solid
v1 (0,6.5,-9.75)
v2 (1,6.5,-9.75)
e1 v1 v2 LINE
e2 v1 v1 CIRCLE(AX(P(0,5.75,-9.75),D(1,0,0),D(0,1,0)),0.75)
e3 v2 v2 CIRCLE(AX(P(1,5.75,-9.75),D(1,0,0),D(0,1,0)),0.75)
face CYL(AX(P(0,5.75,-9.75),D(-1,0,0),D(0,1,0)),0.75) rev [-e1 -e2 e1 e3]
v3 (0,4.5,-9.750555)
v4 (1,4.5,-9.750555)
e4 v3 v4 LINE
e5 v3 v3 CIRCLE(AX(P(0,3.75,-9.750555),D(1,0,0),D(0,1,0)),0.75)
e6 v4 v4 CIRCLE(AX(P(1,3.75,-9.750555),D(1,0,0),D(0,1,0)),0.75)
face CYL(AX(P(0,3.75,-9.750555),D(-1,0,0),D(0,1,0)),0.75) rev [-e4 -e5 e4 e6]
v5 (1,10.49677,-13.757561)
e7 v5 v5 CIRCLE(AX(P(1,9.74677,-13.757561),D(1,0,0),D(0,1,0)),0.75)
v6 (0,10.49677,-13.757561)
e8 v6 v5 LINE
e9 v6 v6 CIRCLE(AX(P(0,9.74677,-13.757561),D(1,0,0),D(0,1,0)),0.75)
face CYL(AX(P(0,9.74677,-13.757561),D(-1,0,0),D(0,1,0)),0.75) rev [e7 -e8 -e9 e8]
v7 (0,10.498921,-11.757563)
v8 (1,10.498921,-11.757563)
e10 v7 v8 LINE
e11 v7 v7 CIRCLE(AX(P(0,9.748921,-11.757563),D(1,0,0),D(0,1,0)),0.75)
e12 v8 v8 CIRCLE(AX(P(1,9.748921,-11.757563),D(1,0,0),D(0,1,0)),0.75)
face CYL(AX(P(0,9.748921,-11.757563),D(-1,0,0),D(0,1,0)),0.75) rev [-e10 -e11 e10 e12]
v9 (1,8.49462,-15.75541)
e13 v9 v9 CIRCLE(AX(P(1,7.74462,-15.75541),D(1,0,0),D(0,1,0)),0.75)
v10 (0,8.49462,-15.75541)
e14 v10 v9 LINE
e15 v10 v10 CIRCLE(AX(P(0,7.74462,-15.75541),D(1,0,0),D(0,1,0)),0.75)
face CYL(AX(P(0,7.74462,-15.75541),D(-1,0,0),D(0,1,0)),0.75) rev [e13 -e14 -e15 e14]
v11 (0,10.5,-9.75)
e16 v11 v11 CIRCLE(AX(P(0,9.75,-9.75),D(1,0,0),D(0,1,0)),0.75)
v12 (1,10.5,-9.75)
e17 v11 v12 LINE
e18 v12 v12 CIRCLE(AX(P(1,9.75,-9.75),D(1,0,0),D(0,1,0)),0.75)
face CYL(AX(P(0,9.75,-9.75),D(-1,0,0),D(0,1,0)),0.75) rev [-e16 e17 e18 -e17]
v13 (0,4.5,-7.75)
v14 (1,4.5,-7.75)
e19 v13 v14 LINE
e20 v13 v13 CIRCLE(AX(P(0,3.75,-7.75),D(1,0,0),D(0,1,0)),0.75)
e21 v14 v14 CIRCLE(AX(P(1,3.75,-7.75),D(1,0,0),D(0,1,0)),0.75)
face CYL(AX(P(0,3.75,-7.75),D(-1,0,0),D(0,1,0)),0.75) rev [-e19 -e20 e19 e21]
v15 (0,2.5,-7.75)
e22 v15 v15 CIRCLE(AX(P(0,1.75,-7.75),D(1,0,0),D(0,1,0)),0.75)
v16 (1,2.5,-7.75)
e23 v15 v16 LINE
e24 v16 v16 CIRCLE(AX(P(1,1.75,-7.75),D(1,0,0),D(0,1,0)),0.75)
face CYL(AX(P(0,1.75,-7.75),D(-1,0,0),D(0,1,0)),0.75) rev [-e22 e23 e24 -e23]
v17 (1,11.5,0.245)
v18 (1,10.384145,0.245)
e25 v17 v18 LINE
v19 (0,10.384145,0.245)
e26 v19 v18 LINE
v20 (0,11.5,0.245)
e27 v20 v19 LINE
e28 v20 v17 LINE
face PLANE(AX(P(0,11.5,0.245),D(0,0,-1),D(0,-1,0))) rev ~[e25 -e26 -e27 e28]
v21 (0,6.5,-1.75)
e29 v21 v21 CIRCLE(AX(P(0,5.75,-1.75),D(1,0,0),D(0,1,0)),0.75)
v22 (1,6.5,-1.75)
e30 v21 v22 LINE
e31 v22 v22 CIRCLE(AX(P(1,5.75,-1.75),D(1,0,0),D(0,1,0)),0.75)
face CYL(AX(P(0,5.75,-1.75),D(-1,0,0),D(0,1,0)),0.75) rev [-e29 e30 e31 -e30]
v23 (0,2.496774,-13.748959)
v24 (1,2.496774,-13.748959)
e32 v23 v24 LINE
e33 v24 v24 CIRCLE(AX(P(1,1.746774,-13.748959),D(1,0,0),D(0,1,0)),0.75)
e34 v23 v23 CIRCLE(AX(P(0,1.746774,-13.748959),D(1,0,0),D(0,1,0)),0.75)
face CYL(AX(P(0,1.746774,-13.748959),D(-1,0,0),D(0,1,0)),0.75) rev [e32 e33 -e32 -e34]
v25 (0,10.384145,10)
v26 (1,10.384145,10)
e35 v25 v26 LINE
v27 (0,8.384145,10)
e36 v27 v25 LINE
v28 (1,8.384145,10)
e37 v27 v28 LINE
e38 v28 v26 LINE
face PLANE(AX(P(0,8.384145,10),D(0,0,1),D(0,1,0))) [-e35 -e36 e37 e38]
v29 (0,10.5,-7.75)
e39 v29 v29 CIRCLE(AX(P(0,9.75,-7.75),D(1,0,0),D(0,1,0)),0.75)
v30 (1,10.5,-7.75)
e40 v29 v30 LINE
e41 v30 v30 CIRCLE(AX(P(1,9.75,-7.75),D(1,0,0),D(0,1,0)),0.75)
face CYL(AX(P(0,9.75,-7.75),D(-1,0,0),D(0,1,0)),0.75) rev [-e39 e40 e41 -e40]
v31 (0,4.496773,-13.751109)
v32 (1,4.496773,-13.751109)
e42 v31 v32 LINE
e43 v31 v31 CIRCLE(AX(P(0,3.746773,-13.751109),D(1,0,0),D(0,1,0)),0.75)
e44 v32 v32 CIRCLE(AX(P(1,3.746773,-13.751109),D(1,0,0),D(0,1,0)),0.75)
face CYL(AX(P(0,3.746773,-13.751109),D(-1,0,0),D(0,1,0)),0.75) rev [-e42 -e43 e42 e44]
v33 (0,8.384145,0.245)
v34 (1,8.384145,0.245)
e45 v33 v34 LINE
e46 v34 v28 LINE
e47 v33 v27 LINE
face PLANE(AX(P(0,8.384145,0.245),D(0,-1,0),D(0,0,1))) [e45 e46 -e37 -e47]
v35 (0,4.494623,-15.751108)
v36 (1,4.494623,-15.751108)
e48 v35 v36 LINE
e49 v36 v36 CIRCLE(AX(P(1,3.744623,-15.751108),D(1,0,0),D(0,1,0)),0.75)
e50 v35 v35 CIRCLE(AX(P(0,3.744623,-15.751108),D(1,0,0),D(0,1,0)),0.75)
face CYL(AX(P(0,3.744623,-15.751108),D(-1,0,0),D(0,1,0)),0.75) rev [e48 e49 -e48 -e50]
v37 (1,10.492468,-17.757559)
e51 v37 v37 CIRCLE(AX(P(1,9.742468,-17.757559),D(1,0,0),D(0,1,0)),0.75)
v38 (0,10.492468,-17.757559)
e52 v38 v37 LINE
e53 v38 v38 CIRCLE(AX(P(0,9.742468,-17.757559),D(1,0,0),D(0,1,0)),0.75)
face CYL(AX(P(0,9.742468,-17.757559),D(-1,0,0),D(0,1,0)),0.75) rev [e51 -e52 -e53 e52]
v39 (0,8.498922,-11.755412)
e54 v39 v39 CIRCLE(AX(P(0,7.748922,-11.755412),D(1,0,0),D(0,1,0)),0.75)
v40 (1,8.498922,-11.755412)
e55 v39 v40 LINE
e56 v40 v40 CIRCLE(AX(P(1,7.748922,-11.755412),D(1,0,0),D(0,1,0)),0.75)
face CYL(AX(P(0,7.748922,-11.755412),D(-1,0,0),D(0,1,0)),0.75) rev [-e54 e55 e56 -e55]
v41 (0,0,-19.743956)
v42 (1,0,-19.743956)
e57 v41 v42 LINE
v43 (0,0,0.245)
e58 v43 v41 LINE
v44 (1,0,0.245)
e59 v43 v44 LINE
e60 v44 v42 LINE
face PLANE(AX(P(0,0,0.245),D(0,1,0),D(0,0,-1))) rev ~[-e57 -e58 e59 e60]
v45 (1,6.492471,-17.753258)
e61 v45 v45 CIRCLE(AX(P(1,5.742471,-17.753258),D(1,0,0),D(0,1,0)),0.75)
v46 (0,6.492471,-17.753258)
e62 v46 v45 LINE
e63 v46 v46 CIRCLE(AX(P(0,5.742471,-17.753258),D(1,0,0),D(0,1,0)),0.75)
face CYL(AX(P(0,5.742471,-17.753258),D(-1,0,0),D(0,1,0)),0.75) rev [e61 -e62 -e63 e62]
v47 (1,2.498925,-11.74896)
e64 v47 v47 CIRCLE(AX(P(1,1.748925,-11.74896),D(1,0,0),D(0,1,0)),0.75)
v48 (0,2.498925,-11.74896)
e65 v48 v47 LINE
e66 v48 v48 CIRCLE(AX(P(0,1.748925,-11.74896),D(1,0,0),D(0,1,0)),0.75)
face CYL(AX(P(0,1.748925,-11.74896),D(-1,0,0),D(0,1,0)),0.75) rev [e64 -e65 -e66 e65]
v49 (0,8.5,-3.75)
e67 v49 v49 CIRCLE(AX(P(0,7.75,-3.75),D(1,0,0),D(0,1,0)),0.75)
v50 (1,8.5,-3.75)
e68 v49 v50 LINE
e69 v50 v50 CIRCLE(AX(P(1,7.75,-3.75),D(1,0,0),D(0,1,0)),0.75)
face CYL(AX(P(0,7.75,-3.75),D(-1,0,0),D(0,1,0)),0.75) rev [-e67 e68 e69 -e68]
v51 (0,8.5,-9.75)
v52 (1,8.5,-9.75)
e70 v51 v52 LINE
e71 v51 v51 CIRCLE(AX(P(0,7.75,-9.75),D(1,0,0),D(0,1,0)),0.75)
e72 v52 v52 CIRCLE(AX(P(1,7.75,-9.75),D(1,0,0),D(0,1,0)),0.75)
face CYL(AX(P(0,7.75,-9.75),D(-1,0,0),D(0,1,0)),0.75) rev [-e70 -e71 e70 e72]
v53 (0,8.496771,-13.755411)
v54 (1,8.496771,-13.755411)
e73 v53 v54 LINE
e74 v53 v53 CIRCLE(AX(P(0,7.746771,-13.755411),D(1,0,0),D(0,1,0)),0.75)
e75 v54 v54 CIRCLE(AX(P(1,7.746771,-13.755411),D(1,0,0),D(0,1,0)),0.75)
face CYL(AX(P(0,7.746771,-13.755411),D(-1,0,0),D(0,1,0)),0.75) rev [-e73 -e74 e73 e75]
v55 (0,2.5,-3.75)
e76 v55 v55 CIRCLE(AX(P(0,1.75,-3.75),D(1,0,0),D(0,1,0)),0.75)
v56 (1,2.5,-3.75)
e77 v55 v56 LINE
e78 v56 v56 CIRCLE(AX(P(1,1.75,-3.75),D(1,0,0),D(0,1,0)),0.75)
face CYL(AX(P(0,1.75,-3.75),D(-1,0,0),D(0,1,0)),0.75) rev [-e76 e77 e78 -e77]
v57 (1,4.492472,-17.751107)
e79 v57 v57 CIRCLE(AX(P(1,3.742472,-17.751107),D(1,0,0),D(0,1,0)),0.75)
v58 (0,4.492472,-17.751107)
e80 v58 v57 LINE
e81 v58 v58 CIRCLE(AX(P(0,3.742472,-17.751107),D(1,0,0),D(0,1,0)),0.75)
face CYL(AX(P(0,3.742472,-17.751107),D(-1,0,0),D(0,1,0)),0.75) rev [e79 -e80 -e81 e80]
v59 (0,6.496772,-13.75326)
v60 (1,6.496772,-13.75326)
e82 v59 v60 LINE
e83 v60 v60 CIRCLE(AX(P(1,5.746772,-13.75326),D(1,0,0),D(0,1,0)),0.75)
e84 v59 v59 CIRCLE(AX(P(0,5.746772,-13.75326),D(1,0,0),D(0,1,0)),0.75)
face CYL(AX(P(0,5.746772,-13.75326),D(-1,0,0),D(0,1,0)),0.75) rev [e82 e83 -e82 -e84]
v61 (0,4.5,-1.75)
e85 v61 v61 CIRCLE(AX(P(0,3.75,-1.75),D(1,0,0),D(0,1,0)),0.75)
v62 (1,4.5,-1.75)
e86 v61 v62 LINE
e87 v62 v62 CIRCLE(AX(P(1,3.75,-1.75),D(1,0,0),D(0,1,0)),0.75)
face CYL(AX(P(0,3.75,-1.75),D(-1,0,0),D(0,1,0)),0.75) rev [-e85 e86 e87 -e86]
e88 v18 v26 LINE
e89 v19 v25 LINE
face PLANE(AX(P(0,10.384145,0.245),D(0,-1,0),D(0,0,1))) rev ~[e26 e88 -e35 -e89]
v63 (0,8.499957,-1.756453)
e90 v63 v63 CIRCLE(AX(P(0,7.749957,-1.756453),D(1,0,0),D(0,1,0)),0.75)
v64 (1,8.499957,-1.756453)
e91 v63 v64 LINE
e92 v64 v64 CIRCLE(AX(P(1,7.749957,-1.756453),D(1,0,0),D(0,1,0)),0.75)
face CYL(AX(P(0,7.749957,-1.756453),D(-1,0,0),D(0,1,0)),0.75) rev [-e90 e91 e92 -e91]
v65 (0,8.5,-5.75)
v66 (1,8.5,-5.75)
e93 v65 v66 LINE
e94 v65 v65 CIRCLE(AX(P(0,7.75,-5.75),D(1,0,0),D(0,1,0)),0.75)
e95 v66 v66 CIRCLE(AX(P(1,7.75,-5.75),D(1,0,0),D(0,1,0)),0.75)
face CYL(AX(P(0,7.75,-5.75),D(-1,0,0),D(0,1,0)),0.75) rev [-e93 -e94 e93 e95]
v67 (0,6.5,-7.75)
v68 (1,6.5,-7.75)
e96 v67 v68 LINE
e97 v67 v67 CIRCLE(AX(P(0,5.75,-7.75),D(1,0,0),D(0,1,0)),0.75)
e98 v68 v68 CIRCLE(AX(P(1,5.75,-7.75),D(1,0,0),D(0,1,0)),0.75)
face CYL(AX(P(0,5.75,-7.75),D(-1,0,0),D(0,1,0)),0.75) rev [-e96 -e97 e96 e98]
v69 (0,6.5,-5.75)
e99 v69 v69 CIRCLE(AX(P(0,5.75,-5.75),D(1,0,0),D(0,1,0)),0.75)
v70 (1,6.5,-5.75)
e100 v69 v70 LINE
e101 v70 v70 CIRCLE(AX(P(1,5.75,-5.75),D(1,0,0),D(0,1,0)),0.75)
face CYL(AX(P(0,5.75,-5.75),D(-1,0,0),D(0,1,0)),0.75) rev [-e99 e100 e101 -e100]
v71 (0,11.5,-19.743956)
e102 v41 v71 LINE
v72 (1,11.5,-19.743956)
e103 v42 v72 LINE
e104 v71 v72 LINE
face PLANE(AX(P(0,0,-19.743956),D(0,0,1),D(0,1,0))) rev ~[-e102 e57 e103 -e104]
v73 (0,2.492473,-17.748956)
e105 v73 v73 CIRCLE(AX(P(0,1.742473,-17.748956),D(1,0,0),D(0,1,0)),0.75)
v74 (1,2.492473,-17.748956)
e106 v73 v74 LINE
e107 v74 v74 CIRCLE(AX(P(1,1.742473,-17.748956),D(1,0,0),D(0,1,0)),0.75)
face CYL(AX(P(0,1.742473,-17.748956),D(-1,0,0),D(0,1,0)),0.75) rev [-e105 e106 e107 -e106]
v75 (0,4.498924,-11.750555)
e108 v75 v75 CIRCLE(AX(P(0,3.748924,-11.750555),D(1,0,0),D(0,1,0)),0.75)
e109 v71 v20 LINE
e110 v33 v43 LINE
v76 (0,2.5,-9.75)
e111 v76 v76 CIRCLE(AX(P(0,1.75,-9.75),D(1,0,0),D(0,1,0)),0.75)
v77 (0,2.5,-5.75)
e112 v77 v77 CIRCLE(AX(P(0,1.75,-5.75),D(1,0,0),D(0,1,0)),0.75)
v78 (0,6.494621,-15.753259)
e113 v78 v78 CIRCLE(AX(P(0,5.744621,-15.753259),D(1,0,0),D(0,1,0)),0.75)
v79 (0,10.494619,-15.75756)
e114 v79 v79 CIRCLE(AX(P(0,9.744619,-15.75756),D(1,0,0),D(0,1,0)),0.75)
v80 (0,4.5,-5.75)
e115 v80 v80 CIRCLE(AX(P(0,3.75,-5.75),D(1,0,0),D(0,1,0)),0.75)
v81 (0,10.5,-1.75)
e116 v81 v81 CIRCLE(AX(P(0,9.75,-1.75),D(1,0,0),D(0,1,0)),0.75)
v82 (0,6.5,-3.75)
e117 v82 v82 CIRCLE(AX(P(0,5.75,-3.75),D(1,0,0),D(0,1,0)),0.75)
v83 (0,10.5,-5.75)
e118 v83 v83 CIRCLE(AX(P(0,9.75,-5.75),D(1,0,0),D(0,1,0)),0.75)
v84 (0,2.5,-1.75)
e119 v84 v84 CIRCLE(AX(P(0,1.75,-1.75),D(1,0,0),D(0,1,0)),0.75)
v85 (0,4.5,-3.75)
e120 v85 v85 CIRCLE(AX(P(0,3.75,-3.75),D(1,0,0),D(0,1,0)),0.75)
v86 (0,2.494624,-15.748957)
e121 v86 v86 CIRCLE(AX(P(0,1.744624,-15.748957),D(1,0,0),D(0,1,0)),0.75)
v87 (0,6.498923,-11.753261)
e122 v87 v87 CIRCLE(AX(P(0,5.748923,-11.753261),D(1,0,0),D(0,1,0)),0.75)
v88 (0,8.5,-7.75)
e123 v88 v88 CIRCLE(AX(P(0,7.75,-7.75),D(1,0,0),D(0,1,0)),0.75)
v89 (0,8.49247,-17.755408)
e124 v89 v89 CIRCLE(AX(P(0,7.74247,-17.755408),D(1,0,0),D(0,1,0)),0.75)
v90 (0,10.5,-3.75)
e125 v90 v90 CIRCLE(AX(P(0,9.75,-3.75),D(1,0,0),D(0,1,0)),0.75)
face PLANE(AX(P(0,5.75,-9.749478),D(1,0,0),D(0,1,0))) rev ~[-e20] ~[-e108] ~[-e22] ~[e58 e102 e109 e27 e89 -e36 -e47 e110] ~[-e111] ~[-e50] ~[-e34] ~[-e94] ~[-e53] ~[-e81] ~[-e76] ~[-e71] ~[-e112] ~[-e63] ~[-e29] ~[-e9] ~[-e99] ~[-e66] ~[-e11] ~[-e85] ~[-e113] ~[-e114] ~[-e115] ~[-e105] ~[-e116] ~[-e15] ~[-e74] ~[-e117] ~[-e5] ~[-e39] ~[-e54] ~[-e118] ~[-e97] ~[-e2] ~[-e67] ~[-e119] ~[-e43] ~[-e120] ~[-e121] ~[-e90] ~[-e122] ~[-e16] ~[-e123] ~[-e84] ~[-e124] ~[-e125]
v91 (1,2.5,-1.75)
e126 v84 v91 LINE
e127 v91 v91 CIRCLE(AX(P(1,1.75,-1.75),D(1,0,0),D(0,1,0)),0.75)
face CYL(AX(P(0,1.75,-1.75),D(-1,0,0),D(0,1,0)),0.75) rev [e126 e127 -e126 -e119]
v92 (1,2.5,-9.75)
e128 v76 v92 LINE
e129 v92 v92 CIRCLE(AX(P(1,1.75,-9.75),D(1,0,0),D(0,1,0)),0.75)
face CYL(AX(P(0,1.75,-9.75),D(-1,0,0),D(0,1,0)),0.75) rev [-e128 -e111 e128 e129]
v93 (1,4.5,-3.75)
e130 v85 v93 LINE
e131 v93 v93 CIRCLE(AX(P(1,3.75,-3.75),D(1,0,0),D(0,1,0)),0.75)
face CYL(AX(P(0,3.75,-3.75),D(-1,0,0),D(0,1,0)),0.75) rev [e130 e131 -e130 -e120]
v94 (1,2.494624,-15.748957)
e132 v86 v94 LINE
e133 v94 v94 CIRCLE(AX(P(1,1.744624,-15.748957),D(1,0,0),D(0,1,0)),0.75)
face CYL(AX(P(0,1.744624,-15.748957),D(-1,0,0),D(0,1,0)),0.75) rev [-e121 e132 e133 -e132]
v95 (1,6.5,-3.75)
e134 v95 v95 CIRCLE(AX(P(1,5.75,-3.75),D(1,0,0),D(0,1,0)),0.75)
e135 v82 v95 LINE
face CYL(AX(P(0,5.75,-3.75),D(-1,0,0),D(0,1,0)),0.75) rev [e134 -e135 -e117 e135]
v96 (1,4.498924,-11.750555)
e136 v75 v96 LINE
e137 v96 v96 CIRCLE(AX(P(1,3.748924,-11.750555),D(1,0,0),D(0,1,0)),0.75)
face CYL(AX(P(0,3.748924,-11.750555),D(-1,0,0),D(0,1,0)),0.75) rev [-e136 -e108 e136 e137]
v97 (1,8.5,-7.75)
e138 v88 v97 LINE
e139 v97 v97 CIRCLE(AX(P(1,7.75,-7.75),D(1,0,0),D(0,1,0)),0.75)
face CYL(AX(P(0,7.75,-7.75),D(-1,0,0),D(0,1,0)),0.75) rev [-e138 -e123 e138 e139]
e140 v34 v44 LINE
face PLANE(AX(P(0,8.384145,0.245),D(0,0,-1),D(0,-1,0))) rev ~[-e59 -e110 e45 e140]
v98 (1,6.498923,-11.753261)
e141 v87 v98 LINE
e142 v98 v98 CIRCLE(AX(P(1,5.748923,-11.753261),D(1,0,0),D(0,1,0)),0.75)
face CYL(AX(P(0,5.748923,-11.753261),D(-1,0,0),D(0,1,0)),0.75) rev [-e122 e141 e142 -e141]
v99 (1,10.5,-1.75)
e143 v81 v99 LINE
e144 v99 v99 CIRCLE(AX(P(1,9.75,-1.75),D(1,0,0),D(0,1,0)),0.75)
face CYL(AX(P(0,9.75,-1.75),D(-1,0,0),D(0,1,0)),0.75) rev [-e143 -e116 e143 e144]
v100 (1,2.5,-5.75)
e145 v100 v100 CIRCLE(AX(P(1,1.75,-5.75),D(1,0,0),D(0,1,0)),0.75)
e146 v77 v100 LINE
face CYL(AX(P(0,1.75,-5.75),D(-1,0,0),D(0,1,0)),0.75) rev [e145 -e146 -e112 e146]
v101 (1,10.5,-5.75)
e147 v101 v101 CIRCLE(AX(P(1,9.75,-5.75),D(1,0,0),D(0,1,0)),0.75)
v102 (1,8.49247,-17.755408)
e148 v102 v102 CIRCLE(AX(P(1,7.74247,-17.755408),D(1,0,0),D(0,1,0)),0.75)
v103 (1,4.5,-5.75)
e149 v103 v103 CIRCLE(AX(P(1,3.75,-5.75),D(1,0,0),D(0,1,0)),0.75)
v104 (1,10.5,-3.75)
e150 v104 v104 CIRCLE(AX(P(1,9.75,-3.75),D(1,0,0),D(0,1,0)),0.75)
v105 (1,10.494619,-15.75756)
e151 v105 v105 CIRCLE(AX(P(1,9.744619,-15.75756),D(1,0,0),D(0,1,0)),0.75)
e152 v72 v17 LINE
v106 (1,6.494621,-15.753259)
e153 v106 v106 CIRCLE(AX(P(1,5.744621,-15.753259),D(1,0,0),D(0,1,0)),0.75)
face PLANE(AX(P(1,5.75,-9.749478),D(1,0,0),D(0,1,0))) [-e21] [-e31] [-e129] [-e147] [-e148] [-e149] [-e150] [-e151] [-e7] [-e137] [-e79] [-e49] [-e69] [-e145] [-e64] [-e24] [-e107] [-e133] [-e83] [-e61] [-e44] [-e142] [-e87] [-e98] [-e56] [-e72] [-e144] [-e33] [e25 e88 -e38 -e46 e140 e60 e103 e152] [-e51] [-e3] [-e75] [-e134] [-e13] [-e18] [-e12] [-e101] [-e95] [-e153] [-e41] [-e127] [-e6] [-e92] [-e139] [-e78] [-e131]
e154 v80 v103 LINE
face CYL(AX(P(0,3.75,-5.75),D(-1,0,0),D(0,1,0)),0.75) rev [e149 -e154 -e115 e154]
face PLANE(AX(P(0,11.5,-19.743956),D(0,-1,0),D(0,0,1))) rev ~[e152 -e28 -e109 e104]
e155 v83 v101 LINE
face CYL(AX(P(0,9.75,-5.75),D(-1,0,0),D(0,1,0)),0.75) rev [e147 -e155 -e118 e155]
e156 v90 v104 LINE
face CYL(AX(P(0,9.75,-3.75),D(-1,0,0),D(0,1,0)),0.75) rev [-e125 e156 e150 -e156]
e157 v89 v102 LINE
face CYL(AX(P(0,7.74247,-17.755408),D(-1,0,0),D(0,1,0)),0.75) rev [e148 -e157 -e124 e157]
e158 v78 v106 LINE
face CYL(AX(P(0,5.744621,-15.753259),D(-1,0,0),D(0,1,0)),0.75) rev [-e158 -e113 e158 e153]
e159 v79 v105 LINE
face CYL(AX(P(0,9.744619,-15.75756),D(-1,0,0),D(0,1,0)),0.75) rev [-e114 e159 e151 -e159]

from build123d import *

# Parameters (mm, degrees)
F0_R     = 0.75
F0_W     = 2
F0_H     = 9.755
F1_DEPTH = 1


# Not quite as in the source:
# - a feature names something its author has since deleted; it is built from what else it names


with BuildPart() as f1:
    # F0 (on Right) → F1 (new body)
    with BuildSketch(Plane.YZ):
        Polygon((0, 0.245), (0, 0), (0, -19.7439561955), (11.5, -19.7439561955), (11.5, 0), (11.5, 0.245), (10.384144865, 0.245), (8.384144865, 0.245), (1.75, 0.245), align=None)
        with Locations((1.7424730282, -17.7489561955)):
            Circle(F0_R, mode=Mode.SUBTRACT)
        with Locations((1.7446237513, -15.7489573519)):
            Circle(F0_R, mode=Mode.SUBTRACT)
        with Locations((1.7467744744, -13.7489585083)):
            Circle(F0_R, mode=Mode.SUBTRACT)
        with Locations((3.7424718718, -17.7511069186)):
            Circle(F0_R, mode=Mode.SUBTRACT)
        with Locations((5.7424707154, -17.7532576417)):
            Circle(F0_R, mode=Mode.SUBTRACT)
        with Locations((3.7446225949, -15.751108075)):
            Circle(F0_R, mode=Mode.SUBTRACT)
        with Locations((3.746773318, -13.7511092314)):
            Circle(F0_R, mode=Mode.SUBTRACT)
        with Locations((5.7446214385, -15.7532587981)):
            Circle(F0_R, mode=Mode.SUBTRACT)
        with Locations((5.7467721616, -13.7532599545)):
            Circle(F0_R, mode=Mode.SUBTRACT)
        with Locations((1.7489251975, -11.7489596647)):
            Circle(F0_R, mode=Mode.SUBTRACT)
        with Locations((1.75, -9.75)):
            Circle(F0_R, mode=Mode.SUBTRACT)
        with Locations((1.75, -7.75)):
            Circle(F0_R, mode=Mode.SUBTRACT)
        with Locations((1.75, -5.75)):
            Circle(F0_R, mode=Mode.SUBTRACT)
        with Locations((3.7489243397, -11.7505550493)):
            Circle(F0_R, mode=Mode.SUBTRACT)
        with Locations((3.7499997014, -9.7505553384)):
            Circle(F0_R, mode=Mode.SUBTRACT)
        with Locations((5.7489228847, -11.7532611109)):
            Circle(F0_R, mode=Mode.SUBTRACT)
        with Locations((3.75, -7.75)):
            Circle(F0_R, mode=Mode.SUBTRACT)
        with Locations((3.75, -5.75)):
            Circle(F0_R, mode=Mode.SUBTRACT)
        with Locations((7.742469559, -17.7554083647)):
            Circle(F0_R, mode=Mode.SUBTRACT)
        with Locations((7.7446202821, -15.7554095212)):
            Circle(F0_R, mode=Mode.SUBTRACT)
        with Locations((7.7467710052, -13.7554106776)):
            Circle(F0_R, mode=Mode.SUBTRACT)
        with Locations((9.7424684026, -17.7575590878)):
            Circle(F0_R, mode=Mode.SUBTRACT)
        with Locations((9.7446191257, -15.7575602442)):
            Circle(F0_R, mode=Mode.SUBTRACT)
        with Locations((9.7467698488, -13.7575614006)):
            Circle(F0_R, mode=Mode.SUBTRACT)
        with Locations((5.75, -9.75)):
            Circle(F0_R, mode=Mode.SUBTRACT)
        with Locations((7.7489217283, -11.755411834)):
            Circle(F0_R, mode=Mode.SUBTRACT)
        with Locations((7.75, -9.75)):
            Circle(F0_R, mode=Mode.SUBTRACT)
        with Locations((5.75, -7.75)):
            Circle(F0_R, mode=Mode.SUBTRACT)
        with Locations((5.75, -5.75)):
            Circle(F0_R, mode=Mode.SUBTRACT)
        with Locations((7.75, -7.75)):
            Circle(F0_R, mode=Mode.SUBTRACT)
        with Locations((7.75, -5.75)):
            Circle(F0_R, mode=Mode.SUBTRACT)
        with Locations((9.7489205719, -11.7575625571)):
            Circle(F0_R, mode=Mode.SUBTRACT)
        with Locations((9.75, -9.75)):
            Circle(F0_R, mode=Mode.SUBTRACT)
        with Locations((9.75, -7.75)):
            Circle(F0_R, mode=Mode.SUBTRACT)
        with Locations((9.75, -5.75)):
            Circle(F0_R, mode=Mode.SUBTRACT)
        with Locations((1.75, -3.75)):
            Circle(F0_R, mode=Mode.SUBTRACT)
        with Locations((1.75, -1.75)):
            Circle(F0_R, mode=Mode.SUBTRACT)
        with Locations((3.75, -3.75)):
            Circle(F0_R, mode=Mode.SUBTRACT)
        with Locations((3.75, -1.75)):
            Circle(F0_R, mode=Mode.SUBTRACT)
        with Locations((5.75, -3.75)):
            Circle(F0_R, mode=Mode.SUBTRACT)
        with Locations((5.75, -1.75)):
            Circle(F0_R, mode=Mode.SUBTRACT)
        with Locations((7.75, -3.75)):
            Circle(F0_R, mode=Mode.SUBTRACT)
        with Locations((7.7499570354, -1.7564534015)):
            Circle(F0_R, mode=Mode.SUBTRACT)
        with Locations((9.75, -3.75)):
            Circle(F0_R, mode=Mode.SUBTRACT)
        with Locations((9.75, -1.75)):
            Circle(F0_R, mode=Mode.SUBTRACT)
        with Locations((9.384144865, 5.1225)):
            Rectangle(F0_W, F0_H)
    extrude(amount=F1_DEPTH)


solid = f1.part
